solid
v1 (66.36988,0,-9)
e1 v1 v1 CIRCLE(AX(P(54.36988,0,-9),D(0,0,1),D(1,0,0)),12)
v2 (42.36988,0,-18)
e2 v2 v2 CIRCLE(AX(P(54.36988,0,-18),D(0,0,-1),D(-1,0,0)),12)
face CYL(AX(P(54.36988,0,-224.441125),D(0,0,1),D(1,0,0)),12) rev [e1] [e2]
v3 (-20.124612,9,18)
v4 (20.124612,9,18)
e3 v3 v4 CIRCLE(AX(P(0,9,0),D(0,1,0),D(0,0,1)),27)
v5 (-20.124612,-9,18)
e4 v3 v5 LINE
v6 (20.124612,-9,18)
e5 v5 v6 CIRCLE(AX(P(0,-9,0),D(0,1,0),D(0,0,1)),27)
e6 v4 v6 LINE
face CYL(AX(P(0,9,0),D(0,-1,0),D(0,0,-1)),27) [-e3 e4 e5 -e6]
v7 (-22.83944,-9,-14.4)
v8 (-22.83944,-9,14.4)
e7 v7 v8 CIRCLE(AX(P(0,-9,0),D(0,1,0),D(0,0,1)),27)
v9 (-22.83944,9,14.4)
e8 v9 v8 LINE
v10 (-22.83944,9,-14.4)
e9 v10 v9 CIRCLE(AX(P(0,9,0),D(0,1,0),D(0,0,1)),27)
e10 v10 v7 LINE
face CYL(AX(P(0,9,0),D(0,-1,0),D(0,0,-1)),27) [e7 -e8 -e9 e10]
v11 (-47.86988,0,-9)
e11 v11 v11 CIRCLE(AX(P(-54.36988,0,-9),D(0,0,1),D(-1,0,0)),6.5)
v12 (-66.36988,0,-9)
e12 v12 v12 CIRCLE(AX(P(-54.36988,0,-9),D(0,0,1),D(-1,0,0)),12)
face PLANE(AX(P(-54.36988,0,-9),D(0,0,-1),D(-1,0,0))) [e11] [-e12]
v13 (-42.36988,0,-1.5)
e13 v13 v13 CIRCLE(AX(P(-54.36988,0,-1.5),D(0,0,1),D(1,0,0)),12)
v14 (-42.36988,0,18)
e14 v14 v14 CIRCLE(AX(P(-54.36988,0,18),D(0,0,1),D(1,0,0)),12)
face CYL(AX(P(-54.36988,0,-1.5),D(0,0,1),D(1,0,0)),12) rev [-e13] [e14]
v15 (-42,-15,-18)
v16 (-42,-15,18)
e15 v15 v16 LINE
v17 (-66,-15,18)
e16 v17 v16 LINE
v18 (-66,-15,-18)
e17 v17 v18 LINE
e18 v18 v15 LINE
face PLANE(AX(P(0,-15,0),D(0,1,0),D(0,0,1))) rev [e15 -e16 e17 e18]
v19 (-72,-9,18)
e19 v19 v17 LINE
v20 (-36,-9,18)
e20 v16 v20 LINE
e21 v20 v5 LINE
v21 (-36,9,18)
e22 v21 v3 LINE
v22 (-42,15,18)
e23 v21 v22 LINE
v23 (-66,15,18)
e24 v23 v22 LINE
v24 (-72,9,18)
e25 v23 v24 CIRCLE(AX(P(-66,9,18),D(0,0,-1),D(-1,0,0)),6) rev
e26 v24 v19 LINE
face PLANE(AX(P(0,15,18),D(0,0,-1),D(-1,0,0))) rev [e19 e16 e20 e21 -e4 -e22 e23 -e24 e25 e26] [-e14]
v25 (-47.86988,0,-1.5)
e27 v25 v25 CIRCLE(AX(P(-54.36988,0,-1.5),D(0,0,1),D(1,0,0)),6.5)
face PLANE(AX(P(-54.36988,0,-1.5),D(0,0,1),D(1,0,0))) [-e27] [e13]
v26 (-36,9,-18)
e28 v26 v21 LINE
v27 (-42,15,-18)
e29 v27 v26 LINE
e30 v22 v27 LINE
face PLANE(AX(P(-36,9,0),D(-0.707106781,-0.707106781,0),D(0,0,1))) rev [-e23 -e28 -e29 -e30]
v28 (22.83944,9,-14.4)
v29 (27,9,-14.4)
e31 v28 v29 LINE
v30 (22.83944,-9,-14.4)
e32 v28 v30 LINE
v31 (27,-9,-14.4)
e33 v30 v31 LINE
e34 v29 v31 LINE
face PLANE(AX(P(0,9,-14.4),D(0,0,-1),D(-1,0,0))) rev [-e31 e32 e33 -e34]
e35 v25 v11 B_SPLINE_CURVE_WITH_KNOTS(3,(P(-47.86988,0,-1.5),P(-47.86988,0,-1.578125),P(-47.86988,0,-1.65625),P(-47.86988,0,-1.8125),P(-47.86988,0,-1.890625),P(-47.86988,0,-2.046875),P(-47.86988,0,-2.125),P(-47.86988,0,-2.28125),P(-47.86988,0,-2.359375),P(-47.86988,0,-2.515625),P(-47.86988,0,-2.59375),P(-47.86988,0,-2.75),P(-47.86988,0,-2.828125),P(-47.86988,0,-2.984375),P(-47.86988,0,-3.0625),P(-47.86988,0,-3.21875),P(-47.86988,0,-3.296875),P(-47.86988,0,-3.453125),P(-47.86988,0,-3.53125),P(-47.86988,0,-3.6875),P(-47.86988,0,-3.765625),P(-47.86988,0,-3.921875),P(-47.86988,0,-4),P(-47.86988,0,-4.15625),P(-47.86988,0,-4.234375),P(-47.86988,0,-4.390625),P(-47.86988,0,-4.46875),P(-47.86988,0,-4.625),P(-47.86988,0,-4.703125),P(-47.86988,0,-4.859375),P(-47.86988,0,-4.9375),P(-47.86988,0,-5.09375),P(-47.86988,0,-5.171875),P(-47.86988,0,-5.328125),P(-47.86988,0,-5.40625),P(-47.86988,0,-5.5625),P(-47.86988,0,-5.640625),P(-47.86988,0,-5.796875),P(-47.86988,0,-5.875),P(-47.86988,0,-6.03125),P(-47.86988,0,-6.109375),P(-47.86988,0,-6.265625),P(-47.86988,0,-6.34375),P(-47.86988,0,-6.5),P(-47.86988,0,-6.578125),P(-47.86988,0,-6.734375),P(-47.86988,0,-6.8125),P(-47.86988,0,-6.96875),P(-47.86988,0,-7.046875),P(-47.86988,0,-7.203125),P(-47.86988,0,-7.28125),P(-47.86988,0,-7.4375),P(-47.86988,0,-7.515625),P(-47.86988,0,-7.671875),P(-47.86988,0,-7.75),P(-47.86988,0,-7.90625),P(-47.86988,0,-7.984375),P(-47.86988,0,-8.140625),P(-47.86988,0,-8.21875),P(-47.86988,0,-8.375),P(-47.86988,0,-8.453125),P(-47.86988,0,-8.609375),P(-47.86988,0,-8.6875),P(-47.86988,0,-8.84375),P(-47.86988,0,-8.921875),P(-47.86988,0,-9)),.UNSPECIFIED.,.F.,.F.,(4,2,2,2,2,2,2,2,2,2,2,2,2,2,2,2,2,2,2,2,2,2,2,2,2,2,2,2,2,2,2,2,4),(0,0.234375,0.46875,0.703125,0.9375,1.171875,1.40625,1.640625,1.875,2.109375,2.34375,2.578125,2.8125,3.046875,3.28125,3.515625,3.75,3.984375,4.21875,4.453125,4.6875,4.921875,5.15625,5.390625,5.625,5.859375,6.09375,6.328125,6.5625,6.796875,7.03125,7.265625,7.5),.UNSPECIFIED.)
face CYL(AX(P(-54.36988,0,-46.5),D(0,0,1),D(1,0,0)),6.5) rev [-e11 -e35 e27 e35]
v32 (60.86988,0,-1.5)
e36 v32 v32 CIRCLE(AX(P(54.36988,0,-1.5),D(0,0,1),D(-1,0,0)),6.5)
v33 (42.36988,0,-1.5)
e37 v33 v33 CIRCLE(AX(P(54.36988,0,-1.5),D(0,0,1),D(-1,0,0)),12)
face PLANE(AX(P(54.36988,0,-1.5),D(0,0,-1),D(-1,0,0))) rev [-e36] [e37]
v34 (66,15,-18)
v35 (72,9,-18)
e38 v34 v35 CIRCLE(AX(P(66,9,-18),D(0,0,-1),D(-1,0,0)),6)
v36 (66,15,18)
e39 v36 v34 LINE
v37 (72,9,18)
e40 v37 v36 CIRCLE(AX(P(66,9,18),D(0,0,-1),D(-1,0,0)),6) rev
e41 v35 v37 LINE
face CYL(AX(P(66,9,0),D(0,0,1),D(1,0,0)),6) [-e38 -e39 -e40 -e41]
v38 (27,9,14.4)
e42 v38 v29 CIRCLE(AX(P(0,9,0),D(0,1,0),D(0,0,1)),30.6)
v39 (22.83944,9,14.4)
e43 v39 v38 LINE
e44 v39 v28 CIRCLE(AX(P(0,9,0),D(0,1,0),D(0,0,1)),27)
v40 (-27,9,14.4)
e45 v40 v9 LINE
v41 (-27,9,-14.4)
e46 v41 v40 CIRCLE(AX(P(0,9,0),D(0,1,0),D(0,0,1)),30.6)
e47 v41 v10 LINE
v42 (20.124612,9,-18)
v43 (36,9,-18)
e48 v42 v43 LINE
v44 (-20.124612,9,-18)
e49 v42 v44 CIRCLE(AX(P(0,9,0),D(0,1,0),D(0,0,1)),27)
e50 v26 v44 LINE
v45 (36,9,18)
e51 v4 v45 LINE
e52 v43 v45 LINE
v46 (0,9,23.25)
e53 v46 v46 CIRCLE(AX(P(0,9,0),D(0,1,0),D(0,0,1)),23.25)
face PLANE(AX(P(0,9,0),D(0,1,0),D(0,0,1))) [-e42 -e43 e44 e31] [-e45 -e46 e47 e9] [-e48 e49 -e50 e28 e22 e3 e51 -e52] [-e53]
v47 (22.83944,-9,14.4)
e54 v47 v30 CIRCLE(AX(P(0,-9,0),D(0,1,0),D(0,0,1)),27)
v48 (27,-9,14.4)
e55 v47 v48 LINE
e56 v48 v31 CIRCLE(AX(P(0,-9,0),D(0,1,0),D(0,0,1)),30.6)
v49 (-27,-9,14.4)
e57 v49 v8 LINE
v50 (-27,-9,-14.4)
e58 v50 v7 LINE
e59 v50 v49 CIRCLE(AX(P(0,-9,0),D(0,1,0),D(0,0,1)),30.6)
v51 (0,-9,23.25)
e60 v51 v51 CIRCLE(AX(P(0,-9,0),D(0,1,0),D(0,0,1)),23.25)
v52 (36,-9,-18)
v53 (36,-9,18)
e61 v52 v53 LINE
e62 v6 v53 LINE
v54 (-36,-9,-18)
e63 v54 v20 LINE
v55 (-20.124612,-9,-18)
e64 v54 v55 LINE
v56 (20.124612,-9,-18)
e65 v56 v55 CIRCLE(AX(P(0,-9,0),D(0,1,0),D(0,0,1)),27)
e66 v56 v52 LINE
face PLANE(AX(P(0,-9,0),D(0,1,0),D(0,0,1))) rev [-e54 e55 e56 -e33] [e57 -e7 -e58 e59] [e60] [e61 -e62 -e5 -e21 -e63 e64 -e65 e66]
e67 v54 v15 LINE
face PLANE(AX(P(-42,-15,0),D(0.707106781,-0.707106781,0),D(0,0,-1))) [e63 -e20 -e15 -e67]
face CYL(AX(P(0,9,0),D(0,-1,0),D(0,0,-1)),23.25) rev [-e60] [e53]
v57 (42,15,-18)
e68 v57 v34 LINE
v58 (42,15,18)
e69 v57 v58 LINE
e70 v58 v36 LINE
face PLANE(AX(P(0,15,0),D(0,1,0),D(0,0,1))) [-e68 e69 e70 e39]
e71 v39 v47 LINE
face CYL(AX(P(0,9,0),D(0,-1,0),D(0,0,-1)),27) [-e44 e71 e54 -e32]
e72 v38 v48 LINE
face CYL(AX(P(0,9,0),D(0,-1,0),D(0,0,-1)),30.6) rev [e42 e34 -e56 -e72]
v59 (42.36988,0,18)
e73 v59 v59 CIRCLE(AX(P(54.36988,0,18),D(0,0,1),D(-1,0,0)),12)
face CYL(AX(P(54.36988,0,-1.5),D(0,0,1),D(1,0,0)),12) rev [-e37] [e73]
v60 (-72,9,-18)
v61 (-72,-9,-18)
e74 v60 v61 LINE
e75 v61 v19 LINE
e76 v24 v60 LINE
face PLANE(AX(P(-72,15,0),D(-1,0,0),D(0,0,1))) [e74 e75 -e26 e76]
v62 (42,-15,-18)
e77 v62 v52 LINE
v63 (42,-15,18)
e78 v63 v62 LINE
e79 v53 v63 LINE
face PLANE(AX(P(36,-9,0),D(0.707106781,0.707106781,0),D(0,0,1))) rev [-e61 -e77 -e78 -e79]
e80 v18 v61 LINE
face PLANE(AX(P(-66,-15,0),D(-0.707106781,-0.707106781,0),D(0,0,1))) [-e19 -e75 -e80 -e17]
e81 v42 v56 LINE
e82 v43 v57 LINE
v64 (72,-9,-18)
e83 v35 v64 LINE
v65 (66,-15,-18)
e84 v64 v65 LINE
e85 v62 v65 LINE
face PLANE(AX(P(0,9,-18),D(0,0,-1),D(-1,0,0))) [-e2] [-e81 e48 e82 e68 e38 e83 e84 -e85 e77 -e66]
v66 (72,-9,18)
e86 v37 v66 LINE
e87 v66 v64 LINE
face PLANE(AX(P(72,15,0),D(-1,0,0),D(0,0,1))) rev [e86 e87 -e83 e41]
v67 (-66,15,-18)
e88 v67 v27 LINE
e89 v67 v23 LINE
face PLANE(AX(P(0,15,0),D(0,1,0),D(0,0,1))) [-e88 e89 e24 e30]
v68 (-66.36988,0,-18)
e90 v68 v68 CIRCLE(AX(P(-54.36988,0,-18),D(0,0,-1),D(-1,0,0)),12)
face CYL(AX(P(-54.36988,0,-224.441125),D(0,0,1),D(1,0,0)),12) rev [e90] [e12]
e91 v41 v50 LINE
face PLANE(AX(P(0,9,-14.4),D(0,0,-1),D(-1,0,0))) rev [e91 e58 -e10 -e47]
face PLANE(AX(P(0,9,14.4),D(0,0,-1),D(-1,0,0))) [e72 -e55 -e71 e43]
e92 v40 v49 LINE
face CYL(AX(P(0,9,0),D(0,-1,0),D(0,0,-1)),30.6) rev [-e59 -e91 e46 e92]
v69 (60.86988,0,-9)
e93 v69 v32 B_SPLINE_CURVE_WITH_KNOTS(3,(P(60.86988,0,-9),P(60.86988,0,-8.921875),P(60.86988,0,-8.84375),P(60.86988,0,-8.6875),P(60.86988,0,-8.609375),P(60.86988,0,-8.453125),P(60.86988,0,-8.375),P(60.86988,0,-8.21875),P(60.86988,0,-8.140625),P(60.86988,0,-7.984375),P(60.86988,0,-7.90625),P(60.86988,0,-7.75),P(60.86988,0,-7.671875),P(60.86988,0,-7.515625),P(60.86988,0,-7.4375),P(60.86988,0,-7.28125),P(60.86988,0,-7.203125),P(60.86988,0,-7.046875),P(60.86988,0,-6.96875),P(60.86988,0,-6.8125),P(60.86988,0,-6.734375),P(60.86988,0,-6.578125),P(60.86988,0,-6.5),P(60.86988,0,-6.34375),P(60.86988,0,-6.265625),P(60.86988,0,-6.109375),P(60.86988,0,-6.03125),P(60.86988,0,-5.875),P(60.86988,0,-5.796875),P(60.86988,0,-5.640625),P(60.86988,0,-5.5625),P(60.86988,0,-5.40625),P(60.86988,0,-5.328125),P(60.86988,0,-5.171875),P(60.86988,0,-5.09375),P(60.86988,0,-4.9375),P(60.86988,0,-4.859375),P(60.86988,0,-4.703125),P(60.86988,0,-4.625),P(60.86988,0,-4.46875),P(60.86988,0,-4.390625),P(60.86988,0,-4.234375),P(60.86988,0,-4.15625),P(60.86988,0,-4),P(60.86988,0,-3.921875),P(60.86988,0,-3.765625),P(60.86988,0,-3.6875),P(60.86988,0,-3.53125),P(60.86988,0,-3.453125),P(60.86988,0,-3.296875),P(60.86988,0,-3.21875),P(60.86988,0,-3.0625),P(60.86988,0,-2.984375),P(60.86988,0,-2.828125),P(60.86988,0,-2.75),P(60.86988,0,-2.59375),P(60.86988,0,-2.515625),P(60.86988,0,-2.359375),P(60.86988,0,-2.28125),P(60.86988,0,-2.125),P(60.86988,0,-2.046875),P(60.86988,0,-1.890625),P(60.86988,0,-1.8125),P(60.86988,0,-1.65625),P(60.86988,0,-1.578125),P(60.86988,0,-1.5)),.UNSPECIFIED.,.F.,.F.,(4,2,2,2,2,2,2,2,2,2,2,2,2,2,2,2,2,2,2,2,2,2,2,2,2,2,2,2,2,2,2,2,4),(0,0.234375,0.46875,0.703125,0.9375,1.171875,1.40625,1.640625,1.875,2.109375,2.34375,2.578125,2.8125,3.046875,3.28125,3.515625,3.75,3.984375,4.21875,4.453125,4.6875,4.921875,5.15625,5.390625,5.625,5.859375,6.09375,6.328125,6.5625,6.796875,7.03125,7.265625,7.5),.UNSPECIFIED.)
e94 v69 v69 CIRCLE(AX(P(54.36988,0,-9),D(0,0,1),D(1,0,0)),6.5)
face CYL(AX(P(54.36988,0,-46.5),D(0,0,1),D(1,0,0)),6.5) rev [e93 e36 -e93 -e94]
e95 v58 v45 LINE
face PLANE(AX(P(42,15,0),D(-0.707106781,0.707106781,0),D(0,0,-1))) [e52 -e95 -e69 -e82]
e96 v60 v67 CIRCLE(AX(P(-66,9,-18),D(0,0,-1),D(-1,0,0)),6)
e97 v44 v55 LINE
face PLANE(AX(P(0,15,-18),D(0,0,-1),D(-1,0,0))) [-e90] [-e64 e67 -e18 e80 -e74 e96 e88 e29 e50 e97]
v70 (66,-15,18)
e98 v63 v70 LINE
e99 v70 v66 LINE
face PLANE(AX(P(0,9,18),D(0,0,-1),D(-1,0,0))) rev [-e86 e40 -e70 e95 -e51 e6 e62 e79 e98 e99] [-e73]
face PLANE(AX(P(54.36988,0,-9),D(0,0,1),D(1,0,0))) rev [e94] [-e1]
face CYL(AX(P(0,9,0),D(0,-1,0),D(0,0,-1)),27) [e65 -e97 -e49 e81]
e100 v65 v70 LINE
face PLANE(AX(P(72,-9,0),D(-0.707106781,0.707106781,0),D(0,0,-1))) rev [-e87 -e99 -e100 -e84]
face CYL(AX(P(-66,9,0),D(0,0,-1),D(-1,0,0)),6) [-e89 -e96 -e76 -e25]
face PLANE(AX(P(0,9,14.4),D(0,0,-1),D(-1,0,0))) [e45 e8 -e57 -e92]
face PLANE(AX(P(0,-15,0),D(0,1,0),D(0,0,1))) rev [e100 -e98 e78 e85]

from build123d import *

# Parameters (mm, degrees)
SKETCH1_W             = 36
SKETCH1_H             = 36
BOSS_EXTRUDE3_DEPTH   = 15
BOSS_EXTRUDE3_2_DEPTH = 15
SKETCH1_6_R           = 23.25
BOSS_EXTRUDE4_DEPTH   = 9
CHAMFER3_SIZE         = 6
FILLET1_R             = 6
SKETCH2_R             = 6.5
CUT_EXTRUDE2_DEPTH    = 64.5
SKETCH2_4_R           = 12
SKETCH2_4_R_2         = 6.5
CUT_EXTRUDE3_DEPTH    = 19.5
CUT_EXTRUDE5_START    = -7.5
SKETCH4_R             = 12
SKETCH4_R_2           = 6.5
CUT_EXTRUDE5_DEPTH    = 87


with BuildPart() as part:
    # Sketch1 → Boss-Extrude3 (new, symmetric)
    with BuildSketch(Plane(origin=(0, 0, 0), x_dir=(1, 0, 0), z_dir=(0, 1, 0))):
        with Locations((-54, 0)):
            Rectangle(SKETCH1_W, SKETCH1_H)
    extrude(amount=BOSS_EXTRUDE3_DEPTH, both=True)



with BuildPart() as body_2:
    # Sketch1 → Boss-Extrude3 2 (new, symmetric)
    with BuildSketch(Plane(origin=(0, 0, 0), x_dir=(1, 0, 0), z_dir=(0, 1, 0))):
        with Locations((54, 0)):
            Rectangle(SKETCH1_W, SKETCH1_H)
    extrude(amount=BOSS_EXTRUDE3_2_DEPTH, both=True)


with BuildPart() as part_1:
    add(part.part)

    add(body_2.part)  # Boss-Extrude4 merges body 2
    # Sketch1<6> → Boss-Extrude4 (add, symmetric)
    with BuildSketch(Plane(origin=(0, 0, 0), x_dir=(1, 0, 0), z_dir=(0, 1, 0))):
        with BuildLine():
            Line((-72, -18), (-20.124611797, -18))
            ThreePointArc((-20.124611797, -18), (0, -27), (20.124611797, -18))
            Line((20.124611797, -18), (72, -18))
            Line((72, -18), (72, 18))
            Line((72, 18), (20.124611797, 18))
            ThreePointArc((20.124611797, 18), (0, 27), (-20.124611797, 18))
            Line((-20.124611797, 18), (-72, 18))
            Line((-72, 18), (-72, -18))
        make_face()
        with Locations(Location((0, 0, 0), (0, 0, 270))):
            Circle(SKETCH1_6_R, mode=Mode.SUBTRACT)
        with BuildLine():
            Line((22.839439573, 14.4), (27, 14.4))
            ThreePointArc((27, 14.4), (30.6, 0), (27, -14.4))
            Line((27, -14.4), (22.839439573, -14.4))
            ThreePointArc((22.839439573, -14.4), (27, 0), (22.839439573, 14.4))
        make_face(mode=Mode.SUBTRACT)
        with BuildLine():
            Line((-27, 14.4), (-22.839439573, 14.4))
            ThreePointArc((-22.839439573, 14.4), (-27, 0), (-22.839439573, -14.4))
            Line((-22.839439573, -14.4), (-27, -14.4))
            ThreePointArc((-27, -14.4), (-30.6, 0), (-27, 14.4))
        make_face(mode=Mode.SUBTRACT)
    extrude(amount=BOSS_EXTRUDE4_DEPTH, both=True)

    # Chamfer3
    chamfer3_edges = [part_1.edges().sort_by_distance(p)[0] for p in [
        (36, 15, 0),
        (72, -15, 0),
        (36, -15, 0),
        (-36, -15, 0),
        (-72, -15, 0),
        (-36, 15, 0),
    ]]
    chamfer(chamfer3_edges, length=CHAMFER3_SIZE - 0.0001)  # a hair under: the kernel refuses the full size

    # Fillet1
    fillet1_edges = [part_1.edges().sort_by_distance(p)[0] for p in [
        (-72, 15, 0),
        (72, 15, 0),
    ]]
    fillet(fillet1_edges, radius=FILLET1_R)

    # Sketch2 → Cut-Extrude2 (cut)
    with BuildSketch(Plane.XY.offset(18)):
        with Locations((-54.369879574, 0)):
            Circle(SKETCH2_R)
        with Locations((54.369879574, 0)):
            Circle(SKETCH2_R)
    extrude(amount=-CUT_EXTRUDE2_DEPTH, mode=Mode.SUBTRACT)

    # Sketch2<4> → Cut-Extrude3 (cut)
    # profile 1 of 2: a face of its own
    with BuildSketch(Plane.XY.offset(18)):
        with Locations((-54.369879574, 0)):
            Circle(SKETCH2_4_R)
        with Locations((-54.369879574, 0)):
            Circle(SKETCH2_4_R_2, mode=Mode.SUBTRACT)
    # profile 2 of 2: a face of its own
    with BuildSketch(Plane.XY.offset(18)):
        with Locations(Location((54.369879574, 0, 0), (0, 0, 180))):
            Circle(SKETCH2_4_R)
        with Locations((54.369879574, 0)):
            Circle(SKETCH2_4_R_2, mode=Mode.SUBTRACT)
    extrude(amount=-CUT_EXTRUDE3_DEPTH, mode=Mode.SUBTRACT)

    # Sketch4 → Cut-Extrude5 (cut)
    # profile 1 of 2: a face of its own
    with BuildSketch(Plane.XY.offset(-1.5).offset(CUT_EXTRUDE5_START)):
        with Locations(Location((54.369879574, 0, 0), (0, 0, 180))):
            Circle(SKETCH4_R)
        with Locations((54.369879574, 0)):
            Circle(SKETCH4_R_2, mode=Mode.SUBTRACT)
    # profile 2 of 2: a face of its own
    with BuildSketch(Plane.XY.offset(-1.5).offset(CUT_EXTRUDE5_START)):
        with Locations((-54.369879574, 0)):
            Circle(SKETCH4_R)
        with Locations((-54.369879574, 0)):
            Circle(SKETCH4_R_2, mode=Mode.SUBTRACT)
    extrude(amount=-CUT_EXTRUDE5_DEPTH, mode=Mode.SUBTRACT)


solid = part_1.part
